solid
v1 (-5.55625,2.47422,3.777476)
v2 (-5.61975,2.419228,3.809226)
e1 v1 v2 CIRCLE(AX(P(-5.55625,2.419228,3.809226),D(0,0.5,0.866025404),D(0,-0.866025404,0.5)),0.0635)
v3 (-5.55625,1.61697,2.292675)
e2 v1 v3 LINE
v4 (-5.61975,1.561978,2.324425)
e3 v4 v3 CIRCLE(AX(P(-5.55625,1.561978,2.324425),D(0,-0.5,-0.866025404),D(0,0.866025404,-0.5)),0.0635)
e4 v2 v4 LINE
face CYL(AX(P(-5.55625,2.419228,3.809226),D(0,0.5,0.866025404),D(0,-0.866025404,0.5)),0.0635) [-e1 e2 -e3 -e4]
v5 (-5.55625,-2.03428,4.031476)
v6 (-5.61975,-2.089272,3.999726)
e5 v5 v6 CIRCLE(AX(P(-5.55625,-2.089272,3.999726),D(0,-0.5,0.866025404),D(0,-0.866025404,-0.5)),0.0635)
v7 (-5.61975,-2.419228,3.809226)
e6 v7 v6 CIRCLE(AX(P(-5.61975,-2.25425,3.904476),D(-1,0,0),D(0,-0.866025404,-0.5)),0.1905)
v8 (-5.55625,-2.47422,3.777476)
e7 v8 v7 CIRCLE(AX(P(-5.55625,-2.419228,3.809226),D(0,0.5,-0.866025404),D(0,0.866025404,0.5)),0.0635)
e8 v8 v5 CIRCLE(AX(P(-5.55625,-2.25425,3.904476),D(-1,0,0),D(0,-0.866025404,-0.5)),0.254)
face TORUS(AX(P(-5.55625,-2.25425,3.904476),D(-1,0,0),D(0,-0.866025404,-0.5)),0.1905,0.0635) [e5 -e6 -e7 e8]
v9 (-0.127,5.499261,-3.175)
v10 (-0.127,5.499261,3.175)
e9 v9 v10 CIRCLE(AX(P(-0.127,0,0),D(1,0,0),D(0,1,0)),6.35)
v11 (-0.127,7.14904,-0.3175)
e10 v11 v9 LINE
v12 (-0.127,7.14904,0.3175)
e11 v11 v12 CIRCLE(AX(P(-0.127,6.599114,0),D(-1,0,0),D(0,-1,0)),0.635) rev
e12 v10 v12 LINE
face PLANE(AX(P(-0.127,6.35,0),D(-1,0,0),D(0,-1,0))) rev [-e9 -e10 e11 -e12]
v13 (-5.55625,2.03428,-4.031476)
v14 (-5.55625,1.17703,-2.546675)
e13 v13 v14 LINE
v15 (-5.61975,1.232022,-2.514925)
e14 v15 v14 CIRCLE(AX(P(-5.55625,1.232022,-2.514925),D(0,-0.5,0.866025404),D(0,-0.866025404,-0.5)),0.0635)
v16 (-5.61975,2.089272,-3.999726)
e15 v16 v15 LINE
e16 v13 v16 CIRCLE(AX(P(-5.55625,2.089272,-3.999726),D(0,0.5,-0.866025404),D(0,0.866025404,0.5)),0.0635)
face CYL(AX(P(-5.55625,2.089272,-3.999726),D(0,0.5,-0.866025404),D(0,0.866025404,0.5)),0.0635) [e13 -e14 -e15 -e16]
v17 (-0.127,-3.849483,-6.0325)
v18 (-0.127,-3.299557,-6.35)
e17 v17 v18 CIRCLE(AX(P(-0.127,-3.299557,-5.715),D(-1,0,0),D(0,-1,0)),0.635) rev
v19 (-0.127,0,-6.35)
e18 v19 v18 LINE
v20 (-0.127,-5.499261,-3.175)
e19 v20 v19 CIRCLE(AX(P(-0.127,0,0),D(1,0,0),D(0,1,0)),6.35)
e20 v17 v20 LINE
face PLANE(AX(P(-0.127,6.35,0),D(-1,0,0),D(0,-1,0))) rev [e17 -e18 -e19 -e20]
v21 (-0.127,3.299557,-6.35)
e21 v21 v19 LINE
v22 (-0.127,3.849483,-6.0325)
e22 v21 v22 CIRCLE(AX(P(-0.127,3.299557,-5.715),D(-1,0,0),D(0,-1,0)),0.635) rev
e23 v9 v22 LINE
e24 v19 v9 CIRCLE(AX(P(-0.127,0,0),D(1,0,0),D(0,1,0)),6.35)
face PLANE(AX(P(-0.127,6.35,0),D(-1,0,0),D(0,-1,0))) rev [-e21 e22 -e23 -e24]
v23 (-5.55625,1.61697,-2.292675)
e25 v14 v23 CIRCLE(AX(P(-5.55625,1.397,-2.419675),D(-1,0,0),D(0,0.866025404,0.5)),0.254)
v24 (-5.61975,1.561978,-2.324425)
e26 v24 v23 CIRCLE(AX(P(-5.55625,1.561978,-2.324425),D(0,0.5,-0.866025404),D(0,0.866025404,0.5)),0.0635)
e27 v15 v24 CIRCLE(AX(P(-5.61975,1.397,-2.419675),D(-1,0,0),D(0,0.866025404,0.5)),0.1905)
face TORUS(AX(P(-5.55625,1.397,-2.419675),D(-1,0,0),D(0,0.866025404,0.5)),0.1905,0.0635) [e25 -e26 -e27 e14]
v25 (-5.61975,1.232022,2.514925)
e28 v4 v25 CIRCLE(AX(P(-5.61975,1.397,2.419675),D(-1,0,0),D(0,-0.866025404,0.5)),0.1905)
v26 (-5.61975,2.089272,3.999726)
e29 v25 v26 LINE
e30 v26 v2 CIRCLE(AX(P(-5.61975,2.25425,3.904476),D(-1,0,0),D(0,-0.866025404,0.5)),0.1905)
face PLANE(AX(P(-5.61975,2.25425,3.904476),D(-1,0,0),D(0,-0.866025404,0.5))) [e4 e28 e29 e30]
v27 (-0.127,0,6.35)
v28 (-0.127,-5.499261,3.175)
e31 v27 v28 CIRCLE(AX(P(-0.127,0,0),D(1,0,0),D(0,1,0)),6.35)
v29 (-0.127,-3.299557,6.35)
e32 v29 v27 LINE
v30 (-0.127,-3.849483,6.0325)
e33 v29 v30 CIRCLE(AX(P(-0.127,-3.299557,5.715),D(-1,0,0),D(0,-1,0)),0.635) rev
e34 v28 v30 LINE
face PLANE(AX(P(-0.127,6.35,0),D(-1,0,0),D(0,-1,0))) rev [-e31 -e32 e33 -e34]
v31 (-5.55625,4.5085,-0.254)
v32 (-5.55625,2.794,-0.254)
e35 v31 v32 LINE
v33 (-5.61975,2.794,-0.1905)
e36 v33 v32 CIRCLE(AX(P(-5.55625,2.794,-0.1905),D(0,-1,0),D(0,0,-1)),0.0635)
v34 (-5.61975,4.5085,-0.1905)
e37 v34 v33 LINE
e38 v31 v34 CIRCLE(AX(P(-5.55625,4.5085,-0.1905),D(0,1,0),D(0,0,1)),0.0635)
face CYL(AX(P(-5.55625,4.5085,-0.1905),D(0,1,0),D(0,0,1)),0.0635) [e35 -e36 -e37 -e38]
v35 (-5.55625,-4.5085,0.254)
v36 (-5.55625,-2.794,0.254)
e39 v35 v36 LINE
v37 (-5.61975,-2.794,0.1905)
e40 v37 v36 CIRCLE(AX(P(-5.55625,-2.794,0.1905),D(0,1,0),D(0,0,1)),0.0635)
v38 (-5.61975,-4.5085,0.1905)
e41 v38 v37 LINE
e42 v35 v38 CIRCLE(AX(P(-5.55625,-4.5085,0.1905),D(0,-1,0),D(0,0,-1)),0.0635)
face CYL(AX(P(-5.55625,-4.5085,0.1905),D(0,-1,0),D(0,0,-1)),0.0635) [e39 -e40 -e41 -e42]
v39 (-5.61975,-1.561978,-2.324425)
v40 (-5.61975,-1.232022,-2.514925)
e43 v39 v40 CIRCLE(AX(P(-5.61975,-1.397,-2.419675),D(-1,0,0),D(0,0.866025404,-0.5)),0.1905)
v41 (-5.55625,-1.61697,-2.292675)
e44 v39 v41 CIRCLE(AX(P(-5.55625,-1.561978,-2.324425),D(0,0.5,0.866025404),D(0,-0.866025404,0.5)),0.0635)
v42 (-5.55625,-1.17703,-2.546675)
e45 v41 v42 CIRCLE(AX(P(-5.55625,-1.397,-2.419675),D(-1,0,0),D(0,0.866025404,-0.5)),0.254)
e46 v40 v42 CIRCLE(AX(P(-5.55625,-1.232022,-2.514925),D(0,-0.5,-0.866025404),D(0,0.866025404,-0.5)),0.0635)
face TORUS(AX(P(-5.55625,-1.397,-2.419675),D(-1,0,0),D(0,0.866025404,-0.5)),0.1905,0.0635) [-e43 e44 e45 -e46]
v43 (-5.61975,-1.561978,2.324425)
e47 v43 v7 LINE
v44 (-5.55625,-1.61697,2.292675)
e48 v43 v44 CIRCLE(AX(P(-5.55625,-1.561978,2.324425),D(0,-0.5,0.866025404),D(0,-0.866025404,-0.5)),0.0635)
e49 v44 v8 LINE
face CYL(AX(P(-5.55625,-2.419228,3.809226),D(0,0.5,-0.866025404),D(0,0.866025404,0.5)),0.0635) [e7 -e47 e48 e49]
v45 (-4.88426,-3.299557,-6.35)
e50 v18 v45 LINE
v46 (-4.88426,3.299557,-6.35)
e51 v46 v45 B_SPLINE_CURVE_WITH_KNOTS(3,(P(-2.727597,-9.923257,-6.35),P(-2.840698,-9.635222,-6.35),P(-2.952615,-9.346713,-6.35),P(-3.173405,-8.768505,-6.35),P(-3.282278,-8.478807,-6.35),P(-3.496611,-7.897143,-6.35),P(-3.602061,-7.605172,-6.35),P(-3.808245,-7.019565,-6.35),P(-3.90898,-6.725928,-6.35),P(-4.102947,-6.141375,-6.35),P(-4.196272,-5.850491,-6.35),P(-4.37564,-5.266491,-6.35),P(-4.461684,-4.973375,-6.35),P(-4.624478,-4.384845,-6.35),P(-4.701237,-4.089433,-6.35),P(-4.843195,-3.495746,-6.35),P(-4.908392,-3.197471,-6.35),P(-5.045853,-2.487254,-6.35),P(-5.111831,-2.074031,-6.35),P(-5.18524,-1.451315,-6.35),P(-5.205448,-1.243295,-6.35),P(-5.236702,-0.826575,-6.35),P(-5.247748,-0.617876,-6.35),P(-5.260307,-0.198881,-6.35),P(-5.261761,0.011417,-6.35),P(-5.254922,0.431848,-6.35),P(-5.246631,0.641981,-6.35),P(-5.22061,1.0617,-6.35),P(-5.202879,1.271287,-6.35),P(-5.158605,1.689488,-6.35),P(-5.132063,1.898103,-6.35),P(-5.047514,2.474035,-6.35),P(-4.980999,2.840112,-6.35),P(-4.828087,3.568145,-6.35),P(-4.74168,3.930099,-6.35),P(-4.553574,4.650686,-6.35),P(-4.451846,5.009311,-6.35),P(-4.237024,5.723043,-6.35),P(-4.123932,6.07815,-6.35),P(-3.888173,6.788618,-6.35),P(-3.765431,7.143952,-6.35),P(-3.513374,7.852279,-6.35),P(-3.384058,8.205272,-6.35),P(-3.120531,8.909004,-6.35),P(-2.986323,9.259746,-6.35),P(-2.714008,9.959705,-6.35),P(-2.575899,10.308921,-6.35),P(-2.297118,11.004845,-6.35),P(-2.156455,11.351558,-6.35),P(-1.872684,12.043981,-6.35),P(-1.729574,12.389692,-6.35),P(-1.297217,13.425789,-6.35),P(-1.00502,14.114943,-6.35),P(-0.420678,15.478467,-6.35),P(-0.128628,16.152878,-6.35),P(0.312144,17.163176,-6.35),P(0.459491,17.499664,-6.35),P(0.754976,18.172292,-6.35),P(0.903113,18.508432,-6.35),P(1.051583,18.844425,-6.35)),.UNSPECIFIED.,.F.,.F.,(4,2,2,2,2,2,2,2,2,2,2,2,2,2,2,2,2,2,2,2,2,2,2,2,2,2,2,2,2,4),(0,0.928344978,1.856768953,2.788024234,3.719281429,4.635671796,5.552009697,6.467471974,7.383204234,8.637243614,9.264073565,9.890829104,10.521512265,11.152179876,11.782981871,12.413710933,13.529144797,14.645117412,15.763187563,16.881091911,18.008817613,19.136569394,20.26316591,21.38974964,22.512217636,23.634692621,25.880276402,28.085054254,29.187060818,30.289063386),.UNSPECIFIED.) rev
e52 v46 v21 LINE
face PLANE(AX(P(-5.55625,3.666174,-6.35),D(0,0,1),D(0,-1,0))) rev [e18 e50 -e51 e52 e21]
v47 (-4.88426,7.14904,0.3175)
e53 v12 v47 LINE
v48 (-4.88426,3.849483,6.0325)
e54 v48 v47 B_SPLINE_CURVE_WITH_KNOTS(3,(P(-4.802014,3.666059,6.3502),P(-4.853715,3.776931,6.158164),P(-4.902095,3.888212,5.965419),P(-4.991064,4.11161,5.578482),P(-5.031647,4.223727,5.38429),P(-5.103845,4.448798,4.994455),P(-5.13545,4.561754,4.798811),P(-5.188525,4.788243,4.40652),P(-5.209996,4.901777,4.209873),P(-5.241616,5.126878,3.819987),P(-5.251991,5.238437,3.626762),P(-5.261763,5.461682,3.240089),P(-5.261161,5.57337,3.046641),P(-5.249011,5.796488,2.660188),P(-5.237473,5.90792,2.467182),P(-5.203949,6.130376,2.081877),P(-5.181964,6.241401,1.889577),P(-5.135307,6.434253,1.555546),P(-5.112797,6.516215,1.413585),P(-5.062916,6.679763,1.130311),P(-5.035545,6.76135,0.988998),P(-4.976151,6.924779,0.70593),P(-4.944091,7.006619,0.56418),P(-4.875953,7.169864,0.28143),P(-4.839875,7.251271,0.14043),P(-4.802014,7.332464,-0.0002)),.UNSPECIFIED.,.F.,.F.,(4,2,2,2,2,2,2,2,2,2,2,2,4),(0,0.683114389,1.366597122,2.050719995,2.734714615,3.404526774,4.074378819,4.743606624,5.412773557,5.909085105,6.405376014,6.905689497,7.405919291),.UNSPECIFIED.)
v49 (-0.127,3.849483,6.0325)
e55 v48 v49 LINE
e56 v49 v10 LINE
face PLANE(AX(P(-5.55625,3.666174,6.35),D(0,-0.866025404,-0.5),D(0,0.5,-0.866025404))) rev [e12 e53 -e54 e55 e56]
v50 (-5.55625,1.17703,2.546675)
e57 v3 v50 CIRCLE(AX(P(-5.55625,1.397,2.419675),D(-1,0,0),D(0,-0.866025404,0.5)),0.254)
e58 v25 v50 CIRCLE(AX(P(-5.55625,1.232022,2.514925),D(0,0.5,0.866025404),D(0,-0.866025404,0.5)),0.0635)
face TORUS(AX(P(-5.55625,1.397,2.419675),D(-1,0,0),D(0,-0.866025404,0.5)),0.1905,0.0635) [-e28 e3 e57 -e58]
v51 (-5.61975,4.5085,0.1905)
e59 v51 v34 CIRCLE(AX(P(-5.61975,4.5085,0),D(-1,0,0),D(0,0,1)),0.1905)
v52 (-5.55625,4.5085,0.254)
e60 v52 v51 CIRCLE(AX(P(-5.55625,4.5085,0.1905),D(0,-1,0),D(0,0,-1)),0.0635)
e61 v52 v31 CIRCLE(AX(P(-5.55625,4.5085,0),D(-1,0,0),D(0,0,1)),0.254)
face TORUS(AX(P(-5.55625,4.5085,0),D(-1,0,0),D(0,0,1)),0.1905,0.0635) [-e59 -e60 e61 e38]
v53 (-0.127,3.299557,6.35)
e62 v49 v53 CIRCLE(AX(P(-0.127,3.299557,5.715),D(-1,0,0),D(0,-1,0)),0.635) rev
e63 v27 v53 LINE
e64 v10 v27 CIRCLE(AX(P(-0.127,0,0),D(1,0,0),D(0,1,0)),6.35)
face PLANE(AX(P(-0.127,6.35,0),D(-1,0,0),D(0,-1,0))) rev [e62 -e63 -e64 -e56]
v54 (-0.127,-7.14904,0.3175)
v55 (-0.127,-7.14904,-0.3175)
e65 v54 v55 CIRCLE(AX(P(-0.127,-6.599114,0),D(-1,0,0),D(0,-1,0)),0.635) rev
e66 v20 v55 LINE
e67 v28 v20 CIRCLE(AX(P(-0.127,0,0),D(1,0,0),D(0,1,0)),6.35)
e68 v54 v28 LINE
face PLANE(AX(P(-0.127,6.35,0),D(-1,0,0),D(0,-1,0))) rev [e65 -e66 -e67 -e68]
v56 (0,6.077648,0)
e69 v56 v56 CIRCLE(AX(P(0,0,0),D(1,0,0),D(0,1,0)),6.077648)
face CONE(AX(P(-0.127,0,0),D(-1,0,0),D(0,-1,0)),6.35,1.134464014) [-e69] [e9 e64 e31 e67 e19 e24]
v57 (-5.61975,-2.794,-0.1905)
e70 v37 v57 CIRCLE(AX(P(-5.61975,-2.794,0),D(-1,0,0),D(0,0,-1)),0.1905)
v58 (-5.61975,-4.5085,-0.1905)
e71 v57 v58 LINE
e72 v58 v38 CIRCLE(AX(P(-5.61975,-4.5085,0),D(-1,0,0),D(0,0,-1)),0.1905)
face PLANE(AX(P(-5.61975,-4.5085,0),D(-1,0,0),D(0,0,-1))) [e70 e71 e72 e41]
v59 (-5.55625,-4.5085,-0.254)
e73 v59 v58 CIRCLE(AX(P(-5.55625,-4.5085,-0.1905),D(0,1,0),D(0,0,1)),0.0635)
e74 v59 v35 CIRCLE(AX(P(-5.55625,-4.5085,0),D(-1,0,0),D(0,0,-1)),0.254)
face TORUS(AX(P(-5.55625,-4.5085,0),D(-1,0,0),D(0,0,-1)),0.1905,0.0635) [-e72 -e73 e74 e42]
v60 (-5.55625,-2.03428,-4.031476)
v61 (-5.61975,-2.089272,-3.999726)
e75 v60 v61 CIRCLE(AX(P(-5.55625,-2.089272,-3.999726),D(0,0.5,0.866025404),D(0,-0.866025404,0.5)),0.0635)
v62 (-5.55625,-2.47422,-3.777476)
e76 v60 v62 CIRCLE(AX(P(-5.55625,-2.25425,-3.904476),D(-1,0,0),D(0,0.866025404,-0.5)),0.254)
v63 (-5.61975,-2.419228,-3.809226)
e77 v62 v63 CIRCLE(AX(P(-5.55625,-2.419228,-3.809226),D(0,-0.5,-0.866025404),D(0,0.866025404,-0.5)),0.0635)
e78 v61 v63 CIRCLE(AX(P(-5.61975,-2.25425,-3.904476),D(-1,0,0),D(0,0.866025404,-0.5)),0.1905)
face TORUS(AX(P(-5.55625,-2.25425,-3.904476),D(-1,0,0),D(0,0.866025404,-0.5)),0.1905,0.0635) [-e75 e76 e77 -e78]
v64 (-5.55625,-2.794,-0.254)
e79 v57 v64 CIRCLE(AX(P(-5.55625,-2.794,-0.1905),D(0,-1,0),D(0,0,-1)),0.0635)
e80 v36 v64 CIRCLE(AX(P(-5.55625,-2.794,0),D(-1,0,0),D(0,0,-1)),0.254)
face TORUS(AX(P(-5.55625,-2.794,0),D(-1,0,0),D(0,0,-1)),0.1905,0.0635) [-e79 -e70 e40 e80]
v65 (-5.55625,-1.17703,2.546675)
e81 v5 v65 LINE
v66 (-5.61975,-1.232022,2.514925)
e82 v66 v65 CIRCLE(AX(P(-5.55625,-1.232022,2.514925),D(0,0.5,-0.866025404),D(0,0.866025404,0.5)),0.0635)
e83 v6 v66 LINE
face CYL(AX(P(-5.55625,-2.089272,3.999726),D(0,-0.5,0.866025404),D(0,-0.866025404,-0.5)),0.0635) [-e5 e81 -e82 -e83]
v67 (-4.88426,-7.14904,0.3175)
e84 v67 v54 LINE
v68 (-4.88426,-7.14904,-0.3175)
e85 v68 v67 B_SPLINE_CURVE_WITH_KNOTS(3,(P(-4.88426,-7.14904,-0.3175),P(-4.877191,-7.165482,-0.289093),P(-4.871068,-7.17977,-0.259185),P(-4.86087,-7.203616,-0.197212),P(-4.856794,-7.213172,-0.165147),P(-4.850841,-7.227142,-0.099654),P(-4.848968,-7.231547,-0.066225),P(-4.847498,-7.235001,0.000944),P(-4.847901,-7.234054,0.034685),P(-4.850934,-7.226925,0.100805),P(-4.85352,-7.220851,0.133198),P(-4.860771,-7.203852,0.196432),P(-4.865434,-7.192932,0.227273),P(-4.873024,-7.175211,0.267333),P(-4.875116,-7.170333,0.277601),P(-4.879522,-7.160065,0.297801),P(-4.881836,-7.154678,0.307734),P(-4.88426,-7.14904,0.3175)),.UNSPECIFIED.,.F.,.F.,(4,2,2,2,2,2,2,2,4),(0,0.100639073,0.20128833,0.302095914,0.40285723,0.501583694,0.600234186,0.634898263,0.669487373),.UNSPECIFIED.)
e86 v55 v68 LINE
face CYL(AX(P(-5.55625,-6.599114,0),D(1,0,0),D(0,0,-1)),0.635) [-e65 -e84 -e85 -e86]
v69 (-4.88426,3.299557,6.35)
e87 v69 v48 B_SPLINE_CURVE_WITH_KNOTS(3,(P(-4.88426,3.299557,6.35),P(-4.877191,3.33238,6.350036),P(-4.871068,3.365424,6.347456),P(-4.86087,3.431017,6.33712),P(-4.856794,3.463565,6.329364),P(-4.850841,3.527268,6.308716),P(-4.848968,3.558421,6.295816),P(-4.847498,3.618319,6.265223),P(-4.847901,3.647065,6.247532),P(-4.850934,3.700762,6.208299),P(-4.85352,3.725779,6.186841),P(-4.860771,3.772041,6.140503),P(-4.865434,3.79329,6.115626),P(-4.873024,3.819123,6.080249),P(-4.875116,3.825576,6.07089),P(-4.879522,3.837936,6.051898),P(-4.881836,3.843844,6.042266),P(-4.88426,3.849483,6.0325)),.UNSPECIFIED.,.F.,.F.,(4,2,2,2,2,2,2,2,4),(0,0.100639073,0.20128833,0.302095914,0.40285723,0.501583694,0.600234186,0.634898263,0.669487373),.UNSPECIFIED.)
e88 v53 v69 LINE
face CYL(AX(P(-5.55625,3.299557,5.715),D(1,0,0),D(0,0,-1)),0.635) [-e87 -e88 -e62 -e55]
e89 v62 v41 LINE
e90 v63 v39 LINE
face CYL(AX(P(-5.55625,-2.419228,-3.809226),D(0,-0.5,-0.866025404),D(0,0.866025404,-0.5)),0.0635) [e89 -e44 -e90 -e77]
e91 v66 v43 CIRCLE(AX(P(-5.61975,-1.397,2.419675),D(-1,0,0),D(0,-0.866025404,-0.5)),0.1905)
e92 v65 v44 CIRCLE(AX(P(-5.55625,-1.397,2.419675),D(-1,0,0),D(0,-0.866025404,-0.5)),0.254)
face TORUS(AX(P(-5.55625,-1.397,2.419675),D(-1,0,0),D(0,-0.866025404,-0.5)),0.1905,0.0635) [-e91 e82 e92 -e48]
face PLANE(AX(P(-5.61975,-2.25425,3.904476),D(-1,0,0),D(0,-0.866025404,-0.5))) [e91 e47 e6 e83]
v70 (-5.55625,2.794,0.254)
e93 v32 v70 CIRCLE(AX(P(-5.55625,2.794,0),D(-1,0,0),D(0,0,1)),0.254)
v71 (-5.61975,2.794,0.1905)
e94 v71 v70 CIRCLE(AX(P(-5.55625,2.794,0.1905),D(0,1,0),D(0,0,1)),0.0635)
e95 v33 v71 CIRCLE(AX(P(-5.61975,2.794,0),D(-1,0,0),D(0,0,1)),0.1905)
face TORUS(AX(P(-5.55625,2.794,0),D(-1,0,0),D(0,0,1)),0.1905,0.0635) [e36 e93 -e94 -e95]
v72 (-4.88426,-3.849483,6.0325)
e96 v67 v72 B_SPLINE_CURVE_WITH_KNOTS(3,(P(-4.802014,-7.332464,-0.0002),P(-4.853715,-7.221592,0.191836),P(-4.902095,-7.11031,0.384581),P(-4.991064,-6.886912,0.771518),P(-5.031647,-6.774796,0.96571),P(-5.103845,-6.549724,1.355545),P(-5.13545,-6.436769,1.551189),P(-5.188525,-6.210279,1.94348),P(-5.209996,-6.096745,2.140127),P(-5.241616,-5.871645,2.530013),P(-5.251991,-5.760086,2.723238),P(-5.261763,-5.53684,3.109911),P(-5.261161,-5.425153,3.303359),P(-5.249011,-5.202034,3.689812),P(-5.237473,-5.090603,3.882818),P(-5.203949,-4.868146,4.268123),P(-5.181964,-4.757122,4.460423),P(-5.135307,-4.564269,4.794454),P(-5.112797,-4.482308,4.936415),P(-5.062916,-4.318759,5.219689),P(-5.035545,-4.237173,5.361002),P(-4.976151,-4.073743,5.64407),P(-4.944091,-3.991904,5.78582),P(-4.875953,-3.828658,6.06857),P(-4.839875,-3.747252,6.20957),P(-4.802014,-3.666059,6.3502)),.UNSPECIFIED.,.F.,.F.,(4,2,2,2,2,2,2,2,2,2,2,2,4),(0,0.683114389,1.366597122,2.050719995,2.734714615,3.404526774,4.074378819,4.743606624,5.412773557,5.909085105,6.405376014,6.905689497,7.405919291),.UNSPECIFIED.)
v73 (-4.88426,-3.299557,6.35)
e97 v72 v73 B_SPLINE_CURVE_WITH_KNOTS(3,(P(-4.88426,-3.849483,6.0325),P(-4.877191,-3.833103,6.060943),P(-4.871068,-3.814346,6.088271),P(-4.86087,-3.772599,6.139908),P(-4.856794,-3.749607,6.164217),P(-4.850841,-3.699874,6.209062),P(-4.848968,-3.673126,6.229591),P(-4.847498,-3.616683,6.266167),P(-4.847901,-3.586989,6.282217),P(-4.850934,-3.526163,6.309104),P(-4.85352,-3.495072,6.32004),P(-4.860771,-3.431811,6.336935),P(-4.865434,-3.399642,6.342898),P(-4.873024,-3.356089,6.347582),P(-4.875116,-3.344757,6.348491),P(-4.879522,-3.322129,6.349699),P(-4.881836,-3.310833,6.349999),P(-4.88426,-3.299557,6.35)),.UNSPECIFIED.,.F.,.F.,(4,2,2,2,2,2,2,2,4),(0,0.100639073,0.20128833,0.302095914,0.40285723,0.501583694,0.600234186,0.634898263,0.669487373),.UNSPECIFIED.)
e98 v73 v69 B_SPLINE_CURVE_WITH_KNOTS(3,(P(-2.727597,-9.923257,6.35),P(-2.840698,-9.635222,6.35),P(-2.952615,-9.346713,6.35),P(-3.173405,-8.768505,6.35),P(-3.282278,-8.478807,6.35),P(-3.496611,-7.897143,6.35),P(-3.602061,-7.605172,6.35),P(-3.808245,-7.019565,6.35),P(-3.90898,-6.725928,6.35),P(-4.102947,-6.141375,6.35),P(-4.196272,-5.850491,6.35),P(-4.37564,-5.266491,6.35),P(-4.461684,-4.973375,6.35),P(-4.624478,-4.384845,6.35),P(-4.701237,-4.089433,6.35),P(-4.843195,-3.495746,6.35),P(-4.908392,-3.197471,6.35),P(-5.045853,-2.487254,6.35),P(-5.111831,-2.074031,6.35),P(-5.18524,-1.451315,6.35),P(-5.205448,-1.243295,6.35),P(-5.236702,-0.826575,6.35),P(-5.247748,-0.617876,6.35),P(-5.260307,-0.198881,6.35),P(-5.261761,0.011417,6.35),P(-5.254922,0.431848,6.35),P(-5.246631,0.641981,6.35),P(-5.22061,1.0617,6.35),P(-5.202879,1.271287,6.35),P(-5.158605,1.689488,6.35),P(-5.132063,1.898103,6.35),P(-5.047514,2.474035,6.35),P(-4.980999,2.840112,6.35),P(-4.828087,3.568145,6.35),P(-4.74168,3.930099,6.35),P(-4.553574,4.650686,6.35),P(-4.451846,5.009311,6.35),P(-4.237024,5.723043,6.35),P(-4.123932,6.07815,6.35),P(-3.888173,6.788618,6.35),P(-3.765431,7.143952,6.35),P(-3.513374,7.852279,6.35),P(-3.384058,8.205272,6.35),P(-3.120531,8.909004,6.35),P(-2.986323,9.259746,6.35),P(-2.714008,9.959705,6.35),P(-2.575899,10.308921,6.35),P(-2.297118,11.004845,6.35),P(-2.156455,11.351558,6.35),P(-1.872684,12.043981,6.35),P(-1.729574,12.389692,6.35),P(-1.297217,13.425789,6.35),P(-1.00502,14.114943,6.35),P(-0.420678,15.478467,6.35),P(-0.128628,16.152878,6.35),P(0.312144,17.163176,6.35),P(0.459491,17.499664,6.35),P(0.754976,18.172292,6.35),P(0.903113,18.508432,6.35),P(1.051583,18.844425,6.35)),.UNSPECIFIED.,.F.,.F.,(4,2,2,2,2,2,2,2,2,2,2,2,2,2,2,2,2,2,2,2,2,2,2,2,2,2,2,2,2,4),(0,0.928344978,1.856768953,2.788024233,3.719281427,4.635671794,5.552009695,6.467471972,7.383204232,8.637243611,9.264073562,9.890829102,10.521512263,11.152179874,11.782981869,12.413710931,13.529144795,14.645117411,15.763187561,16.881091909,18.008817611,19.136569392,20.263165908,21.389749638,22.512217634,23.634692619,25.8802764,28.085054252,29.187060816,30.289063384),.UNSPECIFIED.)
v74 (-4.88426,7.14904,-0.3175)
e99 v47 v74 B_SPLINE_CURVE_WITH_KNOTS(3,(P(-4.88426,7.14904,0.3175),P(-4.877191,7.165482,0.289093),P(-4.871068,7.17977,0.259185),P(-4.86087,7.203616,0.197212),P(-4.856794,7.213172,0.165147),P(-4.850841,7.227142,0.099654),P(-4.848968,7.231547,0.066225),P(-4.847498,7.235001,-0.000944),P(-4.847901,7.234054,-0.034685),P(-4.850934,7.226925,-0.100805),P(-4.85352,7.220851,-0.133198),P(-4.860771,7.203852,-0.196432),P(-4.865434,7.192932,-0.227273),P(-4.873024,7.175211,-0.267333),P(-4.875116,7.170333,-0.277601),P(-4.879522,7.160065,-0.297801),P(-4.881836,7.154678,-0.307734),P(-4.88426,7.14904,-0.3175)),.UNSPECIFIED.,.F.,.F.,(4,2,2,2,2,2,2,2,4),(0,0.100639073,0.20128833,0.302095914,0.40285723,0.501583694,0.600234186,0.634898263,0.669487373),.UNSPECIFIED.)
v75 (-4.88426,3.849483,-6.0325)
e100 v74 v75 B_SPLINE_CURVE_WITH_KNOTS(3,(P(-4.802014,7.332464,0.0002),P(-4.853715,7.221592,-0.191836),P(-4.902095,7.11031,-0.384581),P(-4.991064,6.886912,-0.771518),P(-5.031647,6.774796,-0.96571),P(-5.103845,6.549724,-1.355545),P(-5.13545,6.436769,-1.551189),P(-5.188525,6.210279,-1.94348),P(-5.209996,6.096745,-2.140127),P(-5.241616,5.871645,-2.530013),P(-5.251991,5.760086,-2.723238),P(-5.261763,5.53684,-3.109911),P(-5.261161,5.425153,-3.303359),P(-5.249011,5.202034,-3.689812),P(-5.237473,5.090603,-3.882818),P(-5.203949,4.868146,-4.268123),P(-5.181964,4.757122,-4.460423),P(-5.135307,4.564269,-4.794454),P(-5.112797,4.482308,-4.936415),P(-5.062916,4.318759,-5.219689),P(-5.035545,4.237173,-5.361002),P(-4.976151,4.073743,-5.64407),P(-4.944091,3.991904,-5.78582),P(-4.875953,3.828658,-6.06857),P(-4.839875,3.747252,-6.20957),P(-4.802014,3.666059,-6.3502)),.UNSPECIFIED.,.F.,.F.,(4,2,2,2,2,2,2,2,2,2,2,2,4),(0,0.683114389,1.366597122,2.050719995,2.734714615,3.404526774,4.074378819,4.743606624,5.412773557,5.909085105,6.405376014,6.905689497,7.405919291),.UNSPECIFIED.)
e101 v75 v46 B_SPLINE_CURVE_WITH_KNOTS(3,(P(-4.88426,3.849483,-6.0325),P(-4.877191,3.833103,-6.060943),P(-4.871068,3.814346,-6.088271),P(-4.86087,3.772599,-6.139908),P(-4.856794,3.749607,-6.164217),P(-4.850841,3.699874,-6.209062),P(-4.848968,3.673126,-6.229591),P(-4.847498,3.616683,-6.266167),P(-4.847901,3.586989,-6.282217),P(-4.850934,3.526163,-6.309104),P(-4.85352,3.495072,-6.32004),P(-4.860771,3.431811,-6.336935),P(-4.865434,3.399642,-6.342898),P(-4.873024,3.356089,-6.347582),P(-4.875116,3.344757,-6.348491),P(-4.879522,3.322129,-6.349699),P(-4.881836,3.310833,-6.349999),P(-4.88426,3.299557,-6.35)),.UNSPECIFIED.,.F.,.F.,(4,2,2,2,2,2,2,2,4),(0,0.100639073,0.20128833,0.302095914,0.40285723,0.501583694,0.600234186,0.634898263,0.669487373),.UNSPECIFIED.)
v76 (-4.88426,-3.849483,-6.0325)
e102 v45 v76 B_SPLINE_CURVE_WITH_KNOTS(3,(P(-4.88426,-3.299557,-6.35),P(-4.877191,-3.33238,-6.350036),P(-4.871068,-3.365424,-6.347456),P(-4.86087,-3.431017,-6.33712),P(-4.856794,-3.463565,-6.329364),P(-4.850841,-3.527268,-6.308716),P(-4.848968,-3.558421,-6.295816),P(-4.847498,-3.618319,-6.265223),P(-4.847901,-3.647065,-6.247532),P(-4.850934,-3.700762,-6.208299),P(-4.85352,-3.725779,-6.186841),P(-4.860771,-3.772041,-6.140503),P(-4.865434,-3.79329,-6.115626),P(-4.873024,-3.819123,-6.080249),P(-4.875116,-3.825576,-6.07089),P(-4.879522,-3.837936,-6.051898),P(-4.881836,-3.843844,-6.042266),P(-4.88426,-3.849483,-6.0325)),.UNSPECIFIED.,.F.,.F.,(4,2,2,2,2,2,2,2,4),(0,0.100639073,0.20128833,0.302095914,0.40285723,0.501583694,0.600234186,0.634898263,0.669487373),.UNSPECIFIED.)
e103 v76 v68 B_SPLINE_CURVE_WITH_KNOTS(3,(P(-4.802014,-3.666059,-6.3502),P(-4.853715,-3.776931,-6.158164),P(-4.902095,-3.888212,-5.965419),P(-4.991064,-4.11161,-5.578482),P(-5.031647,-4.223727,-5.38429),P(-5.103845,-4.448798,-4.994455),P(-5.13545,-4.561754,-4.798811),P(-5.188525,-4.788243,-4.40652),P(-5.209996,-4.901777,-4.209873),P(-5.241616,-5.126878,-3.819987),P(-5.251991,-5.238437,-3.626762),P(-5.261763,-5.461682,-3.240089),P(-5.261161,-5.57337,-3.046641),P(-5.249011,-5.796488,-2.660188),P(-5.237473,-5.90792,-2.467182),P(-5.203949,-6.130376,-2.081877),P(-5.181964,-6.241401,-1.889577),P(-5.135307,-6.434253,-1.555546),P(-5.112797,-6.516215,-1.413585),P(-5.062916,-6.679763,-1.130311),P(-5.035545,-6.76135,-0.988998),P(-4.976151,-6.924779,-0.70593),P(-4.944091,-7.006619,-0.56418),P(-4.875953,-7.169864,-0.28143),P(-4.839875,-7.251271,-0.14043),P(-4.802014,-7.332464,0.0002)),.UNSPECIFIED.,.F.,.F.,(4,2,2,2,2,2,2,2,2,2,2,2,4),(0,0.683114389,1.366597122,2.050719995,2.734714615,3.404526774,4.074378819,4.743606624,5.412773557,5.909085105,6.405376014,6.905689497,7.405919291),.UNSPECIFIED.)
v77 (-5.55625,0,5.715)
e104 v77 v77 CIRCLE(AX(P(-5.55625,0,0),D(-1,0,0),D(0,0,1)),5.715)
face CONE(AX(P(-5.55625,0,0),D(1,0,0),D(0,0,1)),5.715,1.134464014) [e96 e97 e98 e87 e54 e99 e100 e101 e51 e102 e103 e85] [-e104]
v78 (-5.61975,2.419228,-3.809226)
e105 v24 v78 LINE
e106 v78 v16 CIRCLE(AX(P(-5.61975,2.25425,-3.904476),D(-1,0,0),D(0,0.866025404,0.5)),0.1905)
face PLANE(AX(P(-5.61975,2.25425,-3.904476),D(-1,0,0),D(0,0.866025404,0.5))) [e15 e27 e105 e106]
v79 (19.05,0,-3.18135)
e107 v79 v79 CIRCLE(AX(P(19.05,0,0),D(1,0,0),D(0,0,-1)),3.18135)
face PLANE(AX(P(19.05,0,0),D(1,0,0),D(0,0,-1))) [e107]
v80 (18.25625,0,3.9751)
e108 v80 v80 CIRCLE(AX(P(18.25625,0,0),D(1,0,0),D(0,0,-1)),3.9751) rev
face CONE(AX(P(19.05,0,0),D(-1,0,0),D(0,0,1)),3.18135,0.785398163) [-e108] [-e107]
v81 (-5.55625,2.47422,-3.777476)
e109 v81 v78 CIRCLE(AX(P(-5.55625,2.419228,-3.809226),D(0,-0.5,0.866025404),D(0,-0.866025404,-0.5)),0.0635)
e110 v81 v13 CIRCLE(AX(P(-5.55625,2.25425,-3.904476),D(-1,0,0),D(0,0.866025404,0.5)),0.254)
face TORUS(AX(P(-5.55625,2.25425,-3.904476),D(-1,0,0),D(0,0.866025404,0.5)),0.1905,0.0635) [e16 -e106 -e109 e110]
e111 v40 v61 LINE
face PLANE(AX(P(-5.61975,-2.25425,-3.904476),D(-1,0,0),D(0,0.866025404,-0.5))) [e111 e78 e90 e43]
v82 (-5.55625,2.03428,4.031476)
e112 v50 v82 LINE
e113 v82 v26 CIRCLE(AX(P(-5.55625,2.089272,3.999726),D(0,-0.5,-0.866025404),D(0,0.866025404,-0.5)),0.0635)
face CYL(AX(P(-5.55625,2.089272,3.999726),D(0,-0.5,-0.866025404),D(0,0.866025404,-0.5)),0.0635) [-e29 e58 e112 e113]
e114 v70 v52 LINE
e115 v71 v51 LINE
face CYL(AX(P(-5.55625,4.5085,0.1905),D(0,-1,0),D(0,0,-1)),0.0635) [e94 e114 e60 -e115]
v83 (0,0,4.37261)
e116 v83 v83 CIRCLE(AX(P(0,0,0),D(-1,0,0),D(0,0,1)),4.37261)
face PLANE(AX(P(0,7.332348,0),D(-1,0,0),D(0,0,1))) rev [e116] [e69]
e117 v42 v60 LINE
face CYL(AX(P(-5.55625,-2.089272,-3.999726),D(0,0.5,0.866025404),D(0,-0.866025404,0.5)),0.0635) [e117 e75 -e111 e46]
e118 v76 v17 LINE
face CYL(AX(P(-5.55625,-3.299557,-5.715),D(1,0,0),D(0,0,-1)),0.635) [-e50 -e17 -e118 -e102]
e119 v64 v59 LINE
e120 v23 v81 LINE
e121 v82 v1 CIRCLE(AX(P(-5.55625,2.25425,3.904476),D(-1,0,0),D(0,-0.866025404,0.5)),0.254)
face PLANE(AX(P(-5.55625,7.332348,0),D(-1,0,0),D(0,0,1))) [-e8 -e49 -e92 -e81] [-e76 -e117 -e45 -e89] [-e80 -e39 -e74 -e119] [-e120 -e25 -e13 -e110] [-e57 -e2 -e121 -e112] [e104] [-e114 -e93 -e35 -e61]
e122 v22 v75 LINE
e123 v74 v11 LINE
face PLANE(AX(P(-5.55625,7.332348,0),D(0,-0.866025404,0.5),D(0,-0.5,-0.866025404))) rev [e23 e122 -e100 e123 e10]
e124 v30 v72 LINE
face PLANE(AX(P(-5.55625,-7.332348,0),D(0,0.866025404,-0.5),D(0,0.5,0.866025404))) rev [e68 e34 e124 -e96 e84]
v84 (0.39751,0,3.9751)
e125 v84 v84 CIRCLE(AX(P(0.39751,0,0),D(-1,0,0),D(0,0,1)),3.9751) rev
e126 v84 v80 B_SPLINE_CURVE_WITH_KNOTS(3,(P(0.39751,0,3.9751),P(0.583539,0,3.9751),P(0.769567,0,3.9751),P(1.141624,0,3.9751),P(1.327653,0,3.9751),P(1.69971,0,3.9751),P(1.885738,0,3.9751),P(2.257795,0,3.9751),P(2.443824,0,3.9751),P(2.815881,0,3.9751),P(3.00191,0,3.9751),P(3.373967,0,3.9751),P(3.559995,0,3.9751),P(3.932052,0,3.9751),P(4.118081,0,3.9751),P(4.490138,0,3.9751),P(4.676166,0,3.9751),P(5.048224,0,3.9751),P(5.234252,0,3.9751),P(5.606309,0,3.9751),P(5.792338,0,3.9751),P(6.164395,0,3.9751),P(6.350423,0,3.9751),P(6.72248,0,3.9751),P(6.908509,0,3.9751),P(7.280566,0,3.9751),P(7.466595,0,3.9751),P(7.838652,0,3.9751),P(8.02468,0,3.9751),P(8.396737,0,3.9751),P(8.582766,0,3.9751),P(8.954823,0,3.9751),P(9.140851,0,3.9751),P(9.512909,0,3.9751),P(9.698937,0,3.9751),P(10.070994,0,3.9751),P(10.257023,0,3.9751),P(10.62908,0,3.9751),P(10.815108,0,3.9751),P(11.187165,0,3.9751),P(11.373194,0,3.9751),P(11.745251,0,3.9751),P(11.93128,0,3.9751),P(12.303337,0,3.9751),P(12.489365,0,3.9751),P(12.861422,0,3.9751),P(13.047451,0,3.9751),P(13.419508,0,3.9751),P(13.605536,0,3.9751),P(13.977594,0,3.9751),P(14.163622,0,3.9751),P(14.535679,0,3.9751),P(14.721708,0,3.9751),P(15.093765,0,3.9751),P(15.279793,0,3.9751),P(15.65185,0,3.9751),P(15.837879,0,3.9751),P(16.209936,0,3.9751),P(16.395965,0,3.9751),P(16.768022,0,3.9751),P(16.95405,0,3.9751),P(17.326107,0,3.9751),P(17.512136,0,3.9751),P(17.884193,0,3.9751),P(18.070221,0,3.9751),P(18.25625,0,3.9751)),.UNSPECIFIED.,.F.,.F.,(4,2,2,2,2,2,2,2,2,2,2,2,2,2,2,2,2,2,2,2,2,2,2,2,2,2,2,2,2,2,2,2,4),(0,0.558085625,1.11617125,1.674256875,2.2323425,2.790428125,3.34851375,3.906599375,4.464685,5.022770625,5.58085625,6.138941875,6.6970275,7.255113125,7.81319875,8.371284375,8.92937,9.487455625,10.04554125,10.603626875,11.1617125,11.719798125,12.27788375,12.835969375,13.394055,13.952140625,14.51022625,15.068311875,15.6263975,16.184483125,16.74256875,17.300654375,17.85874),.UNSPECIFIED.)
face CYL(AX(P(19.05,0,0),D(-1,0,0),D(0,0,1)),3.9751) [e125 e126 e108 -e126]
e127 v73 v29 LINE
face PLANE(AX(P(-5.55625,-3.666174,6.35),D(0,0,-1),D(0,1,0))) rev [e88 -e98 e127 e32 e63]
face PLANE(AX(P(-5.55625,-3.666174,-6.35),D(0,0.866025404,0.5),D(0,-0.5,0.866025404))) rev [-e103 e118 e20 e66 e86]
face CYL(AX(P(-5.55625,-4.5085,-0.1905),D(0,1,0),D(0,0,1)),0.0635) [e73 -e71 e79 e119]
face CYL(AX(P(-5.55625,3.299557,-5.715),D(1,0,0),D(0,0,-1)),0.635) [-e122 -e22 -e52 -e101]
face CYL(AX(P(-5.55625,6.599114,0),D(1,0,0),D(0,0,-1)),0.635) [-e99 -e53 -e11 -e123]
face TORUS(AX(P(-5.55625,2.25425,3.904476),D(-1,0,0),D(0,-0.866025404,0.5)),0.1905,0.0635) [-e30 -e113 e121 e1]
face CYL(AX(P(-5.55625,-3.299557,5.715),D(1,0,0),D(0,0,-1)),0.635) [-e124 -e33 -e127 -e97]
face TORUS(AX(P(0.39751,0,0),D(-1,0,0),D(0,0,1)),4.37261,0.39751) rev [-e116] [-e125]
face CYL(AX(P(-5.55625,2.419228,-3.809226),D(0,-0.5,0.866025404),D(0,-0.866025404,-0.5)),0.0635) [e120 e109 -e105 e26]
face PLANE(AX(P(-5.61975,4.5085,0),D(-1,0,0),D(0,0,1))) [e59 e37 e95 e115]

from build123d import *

# Parameters (mm, degrees)
SKETCH2_R                = 3.9751
BOSS_EXTRUDE1_DEPTH      = 19.05
BOSS_EXTRUDE2_DEPTH      = 5.55625
SKETCH5_OUTSIDE_W        = 44.798
SKETCH5_OUTSIDE_H        = 46.762
SKETCH5_OUTSIDE_R        = 5.715
CUT_EXTRUDE1_DEPTH       = 5.55625
CUT_EXTRUDE1_DRAFT       = -65
BOSS_EXTRUDE5_DEPTH      = 0.0635
FILLET5_R                = 0.0635
CIRPATTERN1_COUNT        = 6
FILLET5_OF_CIRPATTERN1_R = 0.0635
FILLET7_R                = 0.635
CHAMFER1_SIZE            = 0.79375
FILLET4_R                = 0.39751


with BuildPart() as part:
    # Sketch2 → Boss-Extrude1 (new body)
    with BuildSketch(Plane(origin=(0, 0, 0), x_dir=(0, 0, -1), z_dir=(1, 0, 0))):
        with Locations(Location((0, 0, 0), (0, 0, 180))):
            Circle(SKETCH2_R)
    extrude(amount=BOSS_EXTRUDE1_DEPTH)

    # Sketch3 → Boss-Extrude2 (add)
    with BuildSketch(Plane.ZY):
        Polygon((0, 7.332348419), (-6.35, 3.666174209), (-6.35, -3.666174209), (0, -7.332348419), (6.35, -3.666174209), (6.35, 3.666174209), align=None)
    extrude(amount=BOSS_EXTRUDE2_DEPTH)


with BuildPart() as cut_extrude1_tool:
    # Sketch5 outside → Cut-Extrude1 (with draft: the straight prism first)
    with BuildSketch(Plane.ZY.offset(5.55625)):
        Rectangle(SKETCH5_OUTSIDE_W, SKETCH5_OUTSIDE_H)
        Circle(SKETCH5_OUTSIDE_R, mode=Mode.SUBTRACT)
    extrude(amount=-CUT_EXTRUDE1_DEPTH)
    # Cut-Extrude1: the draft: its side faces are tilted about the plane it starts from
    cut_extrude1_sides = [cut_extrude1_tool.faces().sort_by_distance(p)[0] for p in [
        (-2.778125, -23.381, 0),
        (-2.778125, 0, 22.399),
        (-2.778125, 23.381, 0),
        (-2.778125, 0, -22.399),
        (-2.778125, 0, -5.715),
    ]]
    draft(cut_extrude1_sides, Plane.ZY.offset(5.55625), CUT_EXTRUDE1_DRAFT)


with BuildPart() as part_1:
    add(part.part)

    # Cut-Extrude1: cut by cut_extrude1_tool
    add(cut_extrude1_tool.part, mode=Mode.SUBTRACT)

    # Sketch11 → Boss-Extrude5 (add)
    with BuildSketch(Plane.ZY.offset(5.55625)):
        with BuildLine():
            Line((0.254, 4.5085), (0.254, 2.794))
            ThreePointArc((0.254, 2.794), (0, 2.54), (-0.254, 2.794))
            Line((-0.254, 2.794), (-0.254, 4.5085))
            ThreePointArc((-0.254, 4.5085), (0, 4.7625), (0.254, 4.5085))
        make_face()
    boss_extrude5 = extrude(amount=BOSS_EXTRUDE5_DEPTH)

    # Fillet5
    fillet5_edges = [part_1.edges().sort_by_distance(p)[0] for p in [
        (-5.61975, 3.65125, 0.254),
        (-5.61975, 2.54, 0),
        (-5.61975, 3.65125, -0.254),
        (-5.61975, 4.7625, 0),
    ]]
    fillet(fillet5_edges, radius=FILLET5_R - 0.0001)  # a hair under: the kernel refuses the full size

    # CirPattern1: Boss-Extrude5 ×6 about axis
    cirpattern1_axis = Axis((0, 0, 0), (1, 0, 0))
    for i in range(1, CIRPATTERN1_COUNT):
        add(boss_extrude5.rotate(cirpattern1_axis, i * 360 / CIRPATTERN1_COUNT))

    # Fillet5 of CirPattern1
    fillet5_of_cirpattern1_edges = [part_1.edges().sort_by_distance(p)[0] for p in [
        (-5.61975, 1.605654547, 3.289075256),
        (-5.61975, 1.27, 2.199704526),
        (-5.61975, 2.045595453, 3.035075256),
        (-5.61975, 2.38125, 4.124445986),
        (-5.61975, -2.045595453, 3.035075256),
        (-5.61975, -1.27, 2.199704526),
        (-5.61975, -1.605654547, 3.289075256),
        (-5.61975, -2.38125, 4.124445986),
        (-5.61975, -3.65125, -0.254),
        (-5.61975, -2.54, 0),
        (-5.61975, -3.65125, 0.254),
        (-5.61975, -4.7625, 0),
        (-5.61975, -1.605654547, -3.289075256),
        (-5.61975, -1.27, -2.199704526),
        (-5.61975, -2.045595453, -3.035075256),
        (-5.61975, -2.38125, -4.124445986),
        (-5.61975, 2.045595453, -3.035075256),
        (-5.61975, 1.27, -2.199704526),
        (-5.61975, 1.605654547, -3.289075256),
        (-5.61975, 2.38125, -4.124445986),
    ]]
    fillet(fillet5_of_cirpattern1_edges, radius=FILLET5_OF_CIRPATTERN1_R - 0.0001)  # a hair under: the kernel refuses the full size

    # Fillet7
    fillet7_edges = [part_1.edges().sort_by_distance(p)[0] for p in [
        (-2.401034023, -7.332348419, 0),
        (-2.401034023, -3.666174209, -6.35),
        (-2.401034023, 3.666174209, -6.35),
        (-2.401034023, 7.332348419, 0),
        (-2.401034023, -3.666174209, 6.35),
        (-2.401034023, 3.666174209, 6.35),
    ]]
    fillet(fillet7_edges, radius=FILLET7_R)

    # Chamfer1
    chamfer1_edges = [part_1.edges().sort_by_distance(p)[0] for p in [
        (19.05, 0, -3.9751),
    ]]
    chamfer(chamfer1_edges, length=CHAMFER1_SIZE)

    # Sketch15 → Cut-Revolve1 (revolve, cut)
    with BuildSketch(Plane.XY, mode=Mode.PRIVATE) as cut_revolve1_sk:
        Polygon((0, 6.077647621), (-0.127, 6.35), (-0.127, 7.332348419), (0, 7.332348419), align=None)
    revolve(cut_revolve1_sk.sketch.rotate(Axis((0, 0, 0), (-1, 0, 0)), 210), axis=Axis((0, 0, 0), (-1, 0, 0)), mode=Mode.SUBTRACT)

    # Fillet4
    fillet4_edges = [part_1.edges().sort_by_distance(p)[0] for p in [
        (0, 0, -3.9751),
    ]]
    fillet(fillet4_edges, radius=FILLET4_R)


solid = part_1.part
